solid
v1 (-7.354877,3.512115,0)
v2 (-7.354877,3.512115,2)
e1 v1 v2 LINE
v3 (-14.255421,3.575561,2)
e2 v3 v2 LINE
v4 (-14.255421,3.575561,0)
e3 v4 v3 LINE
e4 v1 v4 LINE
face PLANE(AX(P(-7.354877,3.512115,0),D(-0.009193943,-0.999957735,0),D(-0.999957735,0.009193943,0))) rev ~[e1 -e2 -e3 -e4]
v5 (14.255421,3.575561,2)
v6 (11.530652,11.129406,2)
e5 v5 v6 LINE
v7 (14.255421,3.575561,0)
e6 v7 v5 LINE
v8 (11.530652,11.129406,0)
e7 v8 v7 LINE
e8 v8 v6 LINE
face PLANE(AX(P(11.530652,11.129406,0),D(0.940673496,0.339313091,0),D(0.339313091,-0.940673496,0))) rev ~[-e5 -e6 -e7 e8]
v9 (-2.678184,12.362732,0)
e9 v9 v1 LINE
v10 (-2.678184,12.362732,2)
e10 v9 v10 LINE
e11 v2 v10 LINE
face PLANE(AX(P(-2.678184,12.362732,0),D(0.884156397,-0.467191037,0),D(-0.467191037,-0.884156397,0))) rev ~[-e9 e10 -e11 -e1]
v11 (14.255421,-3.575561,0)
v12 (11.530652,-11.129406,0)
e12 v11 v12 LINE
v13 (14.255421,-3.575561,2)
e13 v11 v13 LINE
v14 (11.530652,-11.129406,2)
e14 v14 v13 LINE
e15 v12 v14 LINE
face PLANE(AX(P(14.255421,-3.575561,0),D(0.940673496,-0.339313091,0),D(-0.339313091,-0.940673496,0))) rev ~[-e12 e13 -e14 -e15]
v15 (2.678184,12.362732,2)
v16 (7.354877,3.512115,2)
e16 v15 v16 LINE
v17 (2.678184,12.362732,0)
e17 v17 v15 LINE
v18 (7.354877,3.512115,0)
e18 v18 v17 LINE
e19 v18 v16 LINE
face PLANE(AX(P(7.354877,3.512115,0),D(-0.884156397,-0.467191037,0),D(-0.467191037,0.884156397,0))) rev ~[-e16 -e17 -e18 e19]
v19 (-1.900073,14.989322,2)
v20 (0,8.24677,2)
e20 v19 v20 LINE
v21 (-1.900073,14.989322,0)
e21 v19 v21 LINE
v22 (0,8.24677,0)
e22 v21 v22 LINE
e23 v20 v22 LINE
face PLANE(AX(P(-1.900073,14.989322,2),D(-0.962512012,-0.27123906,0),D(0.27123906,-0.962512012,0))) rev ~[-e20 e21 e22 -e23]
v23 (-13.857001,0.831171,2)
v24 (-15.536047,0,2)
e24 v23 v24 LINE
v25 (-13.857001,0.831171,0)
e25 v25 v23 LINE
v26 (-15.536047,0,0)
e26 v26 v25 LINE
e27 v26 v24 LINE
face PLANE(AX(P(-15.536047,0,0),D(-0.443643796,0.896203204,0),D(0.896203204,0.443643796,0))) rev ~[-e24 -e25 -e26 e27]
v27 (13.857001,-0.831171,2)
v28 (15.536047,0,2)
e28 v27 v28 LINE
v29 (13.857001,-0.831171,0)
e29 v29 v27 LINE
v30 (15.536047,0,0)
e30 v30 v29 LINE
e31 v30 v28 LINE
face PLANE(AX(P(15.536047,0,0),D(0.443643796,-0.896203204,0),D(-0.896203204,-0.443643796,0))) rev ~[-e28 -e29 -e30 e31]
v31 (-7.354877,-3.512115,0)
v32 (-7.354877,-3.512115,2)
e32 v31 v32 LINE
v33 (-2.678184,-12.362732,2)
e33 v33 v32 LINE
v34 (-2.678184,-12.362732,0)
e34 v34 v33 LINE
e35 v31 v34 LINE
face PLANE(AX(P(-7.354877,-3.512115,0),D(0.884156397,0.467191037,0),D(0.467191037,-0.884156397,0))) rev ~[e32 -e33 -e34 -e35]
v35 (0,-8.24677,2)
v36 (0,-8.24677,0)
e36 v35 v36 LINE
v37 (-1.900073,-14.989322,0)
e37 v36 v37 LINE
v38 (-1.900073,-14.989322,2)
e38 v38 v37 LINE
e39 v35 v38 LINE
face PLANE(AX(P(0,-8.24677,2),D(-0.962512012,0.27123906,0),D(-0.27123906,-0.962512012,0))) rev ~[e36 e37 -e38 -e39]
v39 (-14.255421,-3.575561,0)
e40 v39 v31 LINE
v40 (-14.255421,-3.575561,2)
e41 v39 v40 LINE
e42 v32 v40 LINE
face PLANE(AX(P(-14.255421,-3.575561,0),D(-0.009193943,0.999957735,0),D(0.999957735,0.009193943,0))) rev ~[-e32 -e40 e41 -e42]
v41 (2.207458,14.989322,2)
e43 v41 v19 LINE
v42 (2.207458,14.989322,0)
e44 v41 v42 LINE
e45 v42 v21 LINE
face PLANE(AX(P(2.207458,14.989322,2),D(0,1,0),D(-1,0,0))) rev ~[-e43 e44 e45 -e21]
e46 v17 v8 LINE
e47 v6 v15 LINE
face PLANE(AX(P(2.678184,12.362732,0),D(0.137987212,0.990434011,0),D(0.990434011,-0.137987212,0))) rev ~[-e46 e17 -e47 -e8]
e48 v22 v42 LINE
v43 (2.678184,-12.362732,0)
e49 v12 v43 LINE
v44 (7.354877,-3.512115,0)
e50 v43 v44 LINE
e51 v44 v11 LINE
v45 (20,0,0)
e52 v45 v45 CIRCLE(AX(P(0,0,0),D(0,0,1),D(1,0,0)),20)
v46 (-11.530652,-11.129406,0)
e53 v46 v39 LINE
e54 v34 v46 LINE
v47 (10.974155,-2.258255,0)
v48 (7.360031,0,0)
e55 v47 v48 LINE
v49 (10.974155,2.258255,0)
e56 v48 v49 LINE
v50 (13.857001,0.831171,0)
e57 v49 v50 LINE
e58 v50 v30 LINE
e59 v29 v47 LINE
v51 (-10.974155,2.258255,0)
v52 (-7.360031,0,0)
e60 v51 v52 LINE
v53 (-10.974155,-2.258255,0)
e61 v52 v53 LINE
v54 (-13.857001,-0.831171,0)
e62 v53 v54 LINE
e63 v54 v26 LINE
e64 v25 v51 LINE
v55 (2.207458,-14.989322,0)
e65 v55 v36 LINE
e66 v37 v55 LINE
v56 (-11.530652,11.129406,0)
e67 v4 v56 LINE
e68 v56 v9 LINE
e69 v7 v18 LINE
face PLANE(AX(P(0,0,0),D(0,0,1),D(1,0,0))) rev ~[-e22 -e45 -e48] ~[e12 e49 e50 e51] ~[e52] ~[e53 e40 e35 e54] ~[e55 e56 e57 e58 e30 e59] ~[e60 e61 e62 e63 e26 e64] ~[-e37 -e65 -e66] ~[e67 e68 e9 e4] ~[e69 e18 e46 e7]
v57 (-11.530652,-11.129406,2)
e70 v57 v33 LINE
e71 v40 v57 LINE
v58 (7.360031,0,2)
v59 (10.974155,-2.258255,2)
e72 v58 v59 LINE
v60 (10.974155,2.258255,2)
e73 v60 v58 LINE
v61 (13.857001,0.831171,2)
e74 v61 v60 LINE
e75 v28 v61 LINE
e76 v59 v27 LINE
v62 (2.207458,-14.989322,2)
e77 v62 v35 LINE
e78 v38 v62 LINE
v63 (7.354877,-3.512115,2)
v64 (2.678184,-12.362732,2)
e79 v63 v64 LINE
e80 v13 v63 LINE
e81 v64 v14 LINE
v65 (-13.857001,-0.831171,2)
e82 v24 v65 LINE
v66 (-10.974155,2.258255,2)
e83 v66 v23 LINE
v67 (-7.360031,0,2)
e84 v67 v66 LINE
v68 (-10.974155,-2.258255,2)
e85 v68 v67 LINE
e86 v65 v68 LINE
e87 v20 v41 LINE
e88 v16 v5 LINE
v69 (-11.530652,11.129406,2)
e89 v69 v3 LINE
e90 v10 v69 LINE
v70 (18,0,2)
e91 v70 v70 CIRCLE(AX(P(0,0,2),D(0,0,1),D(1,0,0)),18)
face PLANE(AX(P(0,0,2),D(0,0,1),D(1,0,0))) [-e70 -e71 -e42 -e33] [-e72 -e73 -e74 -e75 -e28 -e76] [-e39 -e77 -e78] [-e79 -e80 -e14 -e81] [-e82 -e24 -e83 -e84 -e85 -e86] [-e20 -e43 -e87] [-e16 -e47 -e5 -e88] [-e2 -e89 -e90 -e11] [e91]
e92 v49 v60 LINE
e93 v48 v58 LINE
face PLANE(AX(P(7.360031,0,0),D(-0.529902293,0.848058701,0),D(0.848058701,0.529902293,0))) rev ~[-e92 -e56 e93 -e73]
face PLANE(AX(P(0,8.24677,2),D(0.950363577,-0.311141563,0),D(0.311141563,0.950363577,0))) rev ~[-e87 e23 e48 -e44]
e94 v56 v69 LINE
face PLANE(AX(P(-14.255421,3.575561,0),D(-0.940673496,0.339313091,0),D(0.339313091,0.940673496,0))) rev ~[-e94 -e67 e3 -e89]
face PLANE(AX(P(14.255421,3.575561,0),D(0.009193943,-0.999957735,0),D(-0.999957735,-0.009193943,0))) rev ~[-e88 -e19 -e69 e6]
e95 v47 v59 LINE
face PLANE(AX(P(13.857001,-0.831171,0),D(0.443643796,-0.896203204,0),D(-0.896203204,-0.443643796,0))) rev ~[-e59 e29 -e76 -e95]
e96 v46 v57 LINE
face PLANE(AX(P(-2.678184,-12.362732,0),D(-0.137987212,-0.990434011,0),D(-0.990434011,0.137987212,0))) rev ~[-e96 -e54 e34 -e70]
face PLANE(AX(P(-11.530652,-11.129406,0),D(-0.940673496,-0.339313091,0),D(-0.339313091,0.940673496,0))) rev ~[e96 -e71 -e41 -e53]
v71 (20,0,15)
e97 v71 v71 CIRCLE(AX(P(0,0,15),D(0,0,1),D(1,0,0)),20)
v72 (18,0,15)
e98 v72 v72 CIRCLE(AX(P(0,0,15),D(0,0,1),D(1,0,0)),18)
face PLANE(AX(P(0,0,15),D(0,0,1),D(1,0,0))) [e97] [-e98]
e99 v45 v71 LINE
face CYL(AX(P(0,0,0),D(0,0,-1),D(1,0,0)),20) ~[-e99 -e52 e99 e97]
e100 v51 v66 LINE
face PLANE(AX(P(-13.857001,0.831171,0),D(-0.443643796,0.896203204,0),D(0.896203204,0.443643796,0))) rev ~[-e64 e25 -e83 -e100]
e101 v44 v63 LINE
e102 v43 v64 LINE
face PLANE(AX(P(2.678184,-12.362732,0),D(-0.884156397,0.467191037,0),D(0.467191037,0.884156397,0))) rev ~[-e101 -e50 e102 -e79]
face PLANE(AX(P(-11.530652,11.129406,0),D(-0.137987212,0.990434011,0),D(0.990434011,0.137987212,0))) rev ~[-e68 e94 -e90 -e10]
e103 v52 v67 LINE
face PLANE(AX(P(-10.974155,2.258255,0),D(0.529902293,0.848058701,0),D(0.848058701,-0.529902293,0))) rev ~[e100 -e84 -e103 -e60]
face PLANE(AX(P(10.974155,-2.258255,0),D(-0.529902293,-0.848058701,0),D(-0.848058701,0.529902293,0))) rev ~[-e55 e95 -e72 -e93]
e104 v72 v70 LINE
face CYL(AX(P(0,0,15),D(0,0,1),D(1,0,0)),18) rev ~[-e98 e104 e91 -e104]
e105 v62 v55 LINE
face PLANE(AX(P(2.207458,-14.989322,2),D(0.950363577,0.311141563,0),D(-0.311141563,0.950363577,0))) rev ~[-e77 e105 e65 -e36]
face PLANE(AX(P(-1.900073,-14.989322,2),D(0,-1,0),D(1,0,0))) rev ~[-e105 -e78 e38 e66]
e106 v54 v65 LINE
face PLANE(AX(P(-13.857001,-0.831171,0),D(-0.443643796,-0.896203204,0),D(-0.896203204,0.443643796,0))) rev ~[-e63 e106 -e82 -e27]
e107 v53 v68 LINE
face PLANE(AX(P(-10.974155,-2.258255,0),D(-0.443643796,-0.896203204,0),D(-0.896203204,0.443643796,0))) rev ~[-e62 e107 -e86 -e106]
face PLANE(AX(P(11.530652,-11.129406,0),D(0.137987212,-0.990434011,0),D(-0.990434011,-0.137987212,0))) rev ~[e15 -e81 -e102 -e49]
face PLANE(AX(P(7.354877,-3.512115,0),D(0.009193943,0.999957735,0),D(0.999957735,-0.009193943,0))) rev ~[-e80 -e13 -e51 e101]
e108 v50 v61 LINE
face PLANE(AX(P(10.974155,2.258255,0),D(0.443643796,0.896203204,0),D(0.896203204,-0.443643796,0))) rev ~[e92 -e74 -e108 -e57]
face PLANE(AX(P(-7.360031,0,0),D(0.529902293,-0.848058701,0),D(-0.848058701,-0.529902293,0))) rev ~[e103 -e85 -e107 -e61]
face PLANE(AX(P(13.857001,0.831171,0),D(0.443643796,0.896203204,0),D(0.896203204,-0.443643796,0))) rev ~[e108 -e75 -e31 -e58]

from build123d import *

# Parameters (mm, degrees)
F0_R      = 20
F1_DEPTH  = 15
F2_R      = 18
F3_DEPTH  = 13
F9_DEPTH  = 8.7
F11_DEPTH = 11
F13_DEPTH = 22.4
F14_DEPTH = 4.9


# Not quite as in the source:
# - the program builds the solid bodies; features that only make, move or delete a surface that nothing else refers to are left out


with BuildPart() as f1:
    # F0 (on Top) → F1 (new body)
    with BuildSketch(Plane.XY):
        Circle(F0_R)
    extrude(amount=F1_DEPTH)

    # F2 (on face) → F3 (cut)
    with BuildSketch(Plane.XY.offset(15)):
        Circle(F2_R)
    extrude(amount=-F3_DEPTH, mode=Mode.SUBTRACT)

    # F8 (on face) → F9 (cut)
    with BuildSketch(Plane(origin=(0, 0, 0), x_dir=(1, 0, 0), z_dir=(0, 0, -1))):
        Polygon((-11.5306517109, 11.1294062808), (-14.2554212362, 3.5755613353), (-7.3548774235, 3.5121154506), (-2.6781838387, 12.3627316207), align=None)
        Polygon((7.3548774235, 3.5121154506), (14.2554212362, 3.5755613353), (11.5306517109, 11.1294062808), (2.6781838387, 12.3627316207), align=None)
        Polygon((11.5306517109, -11.1294062808), (14.2554212362, -3.5755613353), (7.3548774235, -3.5121154506), (2.6781838387, -12.3627316207), align=None)
        Polygon((-14.2554212362, -3.5755613353), (-11.5306517109, -11.1294062808), (-2.6781838387, -12.3627316207), (-7.3548774235, -3.5121154506), align=None)
    extrude(amount=-F9_DEPTH, mode=Mode.SUBTRACT)

    # F10 (on face) → F11 (cut)
    with BuildSketch(Plane(origin=(0, 0, 0), x_dir=(1, 0, 0), z_dir=(0, 0, -1))):
        Polygon((15.5360468029, 0), (13.8570014387, 0.8311709389), (10.9741548076, 2.2582546808), (7.3600309273, 0), (10.9741548076, -2.2582546808), (13.8570014387, -0.8311709389), align=None)
        Polygon((-10.9741548076, -2.2582546808), (-7.3600309273, 0), (-10.9741548076, 2.2582546808), (-13.8570014387, 0.8311709389), (-15.5360468029, 0), (-13.8570014387, -0.8311709389), align=None)
    extrude(amount=-F11_DEPTH, mode=Mode.SUBTRACT)

    # F12 (on face) → F13 (cut)
    with BuildSketch(Plane.XY.offset(2)):
        Polygon((2.2074584849, 14.9893220514), (-1.9000733737, 14.9893220514), (0, 8.2467701286), align=None)
        Polygon((-1.9000733737, -14.9893220514), (2.2074584849, -14.9893220514), (0, -8.2467701286), align=None)
    extrude(amount=F13_DEPTH, mode=Mode.SUBTRACT)

    # F12 (on face) → F14 (cut)
    with BuildSketch(Plane.XY.offset(2)):
        Polygon((2.2074584849, 14.9893220514), (-1.9000733737, 14.9893220514), (0, 8.2467701286), align=None)
        Polygon((-1.9000733737, -14.9893220514), (2.2074584849, -14.9893220514), (0, -8.2467701286), align=None)
    extrude(amount=-F14_DEPTH, mode=Mode.SUBTRACT)


solid = f1.part
